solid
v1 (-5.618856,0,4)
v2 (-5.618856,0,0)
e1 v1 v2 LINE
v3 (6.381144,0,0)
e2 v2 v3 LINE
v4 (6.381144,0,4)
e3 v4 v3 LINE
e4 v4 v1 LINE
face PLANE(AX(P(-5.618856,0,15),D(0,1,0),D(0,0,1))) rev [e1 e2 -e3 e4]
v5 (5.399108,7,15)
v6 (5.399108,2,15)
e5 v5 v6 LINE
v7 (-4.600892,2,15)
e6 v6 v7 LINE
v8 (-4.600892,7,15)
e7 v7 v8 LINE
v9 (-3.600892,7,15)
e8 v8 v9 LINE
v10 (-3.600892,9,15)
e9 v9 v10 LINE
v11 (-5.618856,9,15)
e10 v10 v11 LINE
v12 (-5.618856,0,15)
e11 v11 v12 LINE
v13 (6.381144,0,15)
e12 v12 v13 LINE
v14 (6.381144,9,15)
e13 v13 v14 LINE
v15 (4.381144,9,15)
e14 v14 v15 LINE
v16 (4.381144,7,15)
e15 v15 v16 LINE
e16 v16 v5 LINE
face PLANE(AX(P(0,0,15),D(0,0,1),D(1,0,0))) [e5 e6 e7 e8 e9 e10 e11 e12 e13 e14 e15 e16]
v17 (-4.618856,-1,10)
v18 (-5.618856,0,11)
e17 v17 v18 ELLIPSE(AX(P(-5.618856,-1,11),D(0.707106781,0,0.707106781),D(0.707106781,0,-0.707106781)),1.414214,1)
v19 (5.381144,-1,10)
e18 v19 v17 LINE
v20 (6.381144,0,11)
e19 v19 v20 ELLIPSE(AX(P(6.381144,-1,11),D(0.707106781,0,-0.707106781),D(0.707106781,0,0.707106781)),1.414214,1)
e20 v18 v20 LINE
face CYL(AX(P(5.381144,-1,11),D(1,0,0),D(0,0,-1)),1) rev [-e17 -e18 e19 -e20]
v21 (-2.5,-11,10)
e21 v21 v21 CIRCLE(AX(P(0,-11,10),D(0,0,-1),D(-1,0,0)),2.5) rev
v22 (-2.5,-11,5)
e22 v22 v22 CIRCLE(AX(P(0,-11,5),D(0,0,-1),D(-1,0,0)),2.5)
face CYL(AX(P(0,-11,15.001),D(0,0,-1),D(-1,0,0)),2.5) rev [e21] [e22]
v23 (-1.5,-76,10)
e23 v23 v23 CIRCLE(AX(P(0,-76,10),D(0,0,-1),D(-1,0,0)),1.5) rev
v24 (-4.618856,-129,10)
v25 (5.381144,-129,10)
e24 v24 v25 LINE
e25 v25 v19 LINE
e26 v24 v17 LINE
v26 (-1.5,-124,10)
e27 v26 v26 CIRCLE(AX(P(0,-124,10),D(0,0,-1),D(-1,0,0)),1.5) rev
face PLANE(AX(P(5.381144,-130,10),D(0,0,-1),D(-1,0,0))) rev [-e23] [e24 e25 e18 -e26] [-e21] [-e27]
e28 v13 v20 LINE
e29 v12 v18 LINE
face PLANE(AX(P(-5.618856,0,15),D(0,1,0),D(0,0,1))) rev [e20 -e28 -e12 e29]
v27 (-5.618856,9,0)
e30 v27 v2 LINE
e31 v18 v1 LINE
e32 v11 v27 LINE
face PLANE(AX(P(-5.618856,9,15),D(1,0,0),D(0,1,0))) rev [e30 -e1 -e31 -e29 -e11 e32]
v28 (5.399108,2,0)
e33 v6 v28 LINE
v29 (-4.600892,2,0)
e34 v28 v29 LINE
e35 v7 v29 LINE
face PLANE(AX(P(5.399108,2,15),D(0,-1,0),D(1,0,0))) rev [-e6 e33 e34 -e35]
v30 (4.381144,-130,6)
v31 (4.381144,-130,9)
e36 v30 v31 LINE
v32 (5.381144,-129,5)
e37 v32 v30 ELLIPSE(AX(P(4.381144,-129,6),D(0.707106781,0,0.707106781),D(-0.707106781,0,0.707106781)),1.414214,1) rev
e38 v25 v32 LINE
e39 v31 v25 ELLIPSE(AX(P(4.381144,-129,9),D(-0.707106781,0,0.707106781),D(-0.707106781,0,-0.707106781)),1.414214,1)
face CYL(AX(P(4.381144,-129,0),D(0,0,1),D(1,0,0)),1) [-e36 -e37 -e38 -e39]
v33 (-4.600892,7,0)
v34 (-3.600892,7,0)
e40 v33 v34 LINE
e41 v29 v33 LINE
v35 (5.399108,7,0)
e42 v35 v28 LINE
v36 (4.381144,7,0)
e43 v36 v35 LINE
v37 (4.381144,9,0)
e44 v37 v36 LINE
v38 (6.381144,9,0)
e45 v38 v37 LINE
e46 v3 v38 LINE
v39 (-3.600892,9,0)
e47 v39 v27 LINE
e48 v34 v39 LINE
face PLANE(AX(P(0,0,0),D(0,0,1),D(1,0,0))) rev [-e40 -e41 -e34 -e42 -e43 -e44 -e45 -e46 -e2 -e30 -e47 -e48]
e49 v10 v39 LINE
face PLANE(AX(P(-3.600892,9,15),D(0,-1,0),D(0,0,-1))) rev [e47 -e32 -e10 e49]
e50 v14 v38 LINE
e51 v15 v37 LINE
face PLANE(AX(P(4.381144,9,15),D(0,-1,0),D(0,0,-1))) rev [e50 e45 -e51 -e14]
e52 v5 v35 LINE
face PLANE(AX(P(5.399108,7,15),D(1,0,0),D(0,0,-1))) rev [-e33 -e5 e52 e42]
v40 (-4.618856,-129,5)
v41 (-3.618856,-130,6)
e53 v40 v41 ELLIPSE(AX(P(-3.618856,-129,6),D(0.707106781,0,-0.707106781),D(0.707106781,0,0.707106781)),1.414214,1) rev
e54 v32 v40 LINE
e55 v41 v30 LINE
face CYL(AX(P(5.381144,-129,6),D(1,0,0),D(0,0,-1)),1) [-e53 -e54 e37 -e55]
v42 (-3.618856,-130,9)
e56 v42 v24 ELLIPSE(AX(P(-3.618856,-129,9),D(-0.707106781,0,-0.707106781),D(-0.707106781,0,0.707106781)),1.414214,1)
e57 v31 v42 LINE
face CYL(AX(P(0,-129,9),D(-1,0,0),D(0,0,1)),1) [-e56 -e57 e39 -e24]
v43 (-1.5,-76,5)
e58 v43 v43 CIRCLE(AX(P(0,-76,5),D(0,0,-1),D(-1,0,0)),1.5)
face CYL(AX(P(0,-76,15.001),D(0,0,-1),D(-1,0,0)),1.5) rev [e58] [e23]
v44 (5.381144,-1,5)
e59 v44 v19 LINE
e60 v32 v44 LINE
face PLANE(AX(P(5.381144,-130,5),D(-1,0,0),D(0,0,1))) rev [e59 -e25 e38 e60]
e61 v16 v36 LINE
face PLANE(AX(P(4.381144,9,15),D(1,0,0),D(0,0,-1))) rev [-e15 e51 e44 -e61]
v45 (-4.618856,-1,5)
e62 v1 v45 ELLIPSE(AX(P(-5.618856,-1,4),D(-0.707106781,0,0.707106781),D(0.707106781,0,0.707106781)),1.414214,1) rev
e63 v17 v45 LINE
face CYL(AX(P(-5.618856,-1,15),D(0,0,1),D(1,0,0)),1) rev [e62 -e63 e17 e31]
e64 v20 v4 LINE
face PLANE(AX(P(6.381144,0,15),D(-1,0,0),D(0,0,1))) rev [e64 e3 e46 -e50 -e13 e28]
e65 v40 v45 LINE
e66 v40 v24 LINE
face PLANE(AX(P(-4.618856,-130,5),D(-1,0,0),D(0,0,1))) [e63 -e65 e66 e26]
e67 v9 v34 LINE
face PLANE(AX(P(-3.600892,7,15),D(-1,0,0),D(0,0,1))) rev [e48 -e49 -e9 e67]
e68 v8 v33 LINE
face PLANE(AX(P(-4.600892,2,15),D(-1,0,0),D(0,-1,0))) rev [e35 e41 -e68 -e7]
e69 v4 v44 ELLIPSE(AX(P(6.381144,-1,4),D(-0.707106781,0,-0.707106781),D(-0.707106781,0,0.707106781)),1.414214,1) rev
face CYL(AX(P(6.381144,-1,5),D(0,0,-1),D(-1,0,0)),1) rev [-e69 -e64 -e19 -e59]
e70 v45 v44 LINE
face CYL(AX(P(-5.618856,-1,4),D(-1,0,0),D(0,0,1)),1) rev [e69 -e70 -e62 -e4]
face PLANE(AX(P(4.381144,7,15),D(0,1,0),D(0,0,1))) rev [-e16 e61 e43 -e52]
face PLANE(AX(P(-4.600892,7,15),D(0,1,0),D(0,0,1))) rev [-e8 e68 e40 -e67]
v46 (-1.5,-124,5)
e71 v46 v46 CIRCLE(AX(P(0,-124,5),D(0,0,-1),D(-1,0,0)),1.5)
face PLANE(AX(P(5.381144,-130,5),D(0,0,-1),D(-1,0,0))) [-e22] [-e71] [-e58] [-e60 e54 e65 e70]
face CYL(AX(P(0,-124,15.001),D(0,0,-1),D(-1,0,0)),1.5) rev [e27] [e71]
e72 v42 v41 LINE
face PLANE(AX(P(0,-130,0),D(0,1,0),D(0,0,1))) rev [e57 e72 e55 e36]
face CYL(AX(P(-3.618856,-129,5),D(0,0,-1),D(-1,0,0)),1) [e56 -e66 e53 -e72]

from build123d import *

# Parameters (mm, degrees)
BOSS_EXTRUDE1_DEPTH = 15
SKETCH2_W           = 10
SKETCH2_H           = 5
BOSS_EXTRUDE2_DEPTH = 130
FILLET3_R           = 1
FILLET4_R           = 1
FILLET5_R           = 1
FILLET6_R           = 1
CUT_EXTRUDE1_REACH  = 132.54
SKETCH3_R           = 2.5
SKETCH3_R_2         = 1.5


with BuildPart() as part:
    # Sketch1 → Boss-Extrude1 (new body)
    with BuildSketch(Plane.XY):
        Polygon((-5.618855965, 9), (-5.618855965, 0), (6.381144035, 0), (6.381144035, 9), (4.381144035, 9), (4.381144035, 7), (5.399108107, 7), (5.399108107, 2), (-4.600891893, 2), (-4.600891893, 7), (-3.600891893, 7), (-3.600891893, 9), align=None)
    extrude(amount=BOSS_EXTRUDE1_DEPTH)

    # Sketch2 → Boss-Extrude2 (add)
    with BuildSketch(Plane.XZ):
        with Locations((0.381144035, 7.5)):
            Rectangle(SKETCH2_W, SKETCH2_H)
    extrude(amount=BOSS_EXTRUDE2_DEPTH)

    # Fillet3
    fillet3_edges = [part.edges().sort_by_distance(p)[0] for p in [
        (0.381144035, 0, 10),
        (-4.618855965, 0, 7.5),
    ]]
    fillet(fillet3_edges, radius=FILLET3_R - 0.0001)  # a hair under: the kernel refuses the full size

    # Fillet4
    fillet4_edges = [part.edges().sort_by_distance(p)[0] for p in [
        (-0.118805965, 0, 5),
    ]]
    fillet(fillet4_edges, radius=FILLET4_R - 0.0001)  # a hair under: the kernel refuses the full size

    # Fillet5
    fillet5_edges = [part.edges().sort_by_distance(p)[0] for p in [
        (5.381144035, 0, 7.5),
    ]]
    fillet(fillet5_edges, radius=FILLET5_R - 0.0001)  # a hair under: the kernel refuses the full size

    # Fillet6
    fillet6_edges = [part.edges().sort_by_distance(p)[0] for p in [
        (-4.618855965, -130, 7.5),
        (0.381144035, -130, 5),
        (0.381144035, -130, 10),
        (5.381144035, -130, 7.5),
    ]]
    fillet(fillet6_edges, radius=FILLET6_R)

    # Sketch3 → Cut-Extrude1 (cut, up to next)
    with BuildSketch(Plane(origin=(0, 0, 5), x_dir=(-1, 0, 0), z_dir=(0, 0, -1)), mode=Mode.PRIVATE) as cut_extrude1_sk1:
        with Locations((0, -11)):
            Circle(SKETCH3_R)
    cut_extrude1_tool1 = extrude(cut_extrude1_sk1.sketch, amount=-CUT_EXTRUDE1_REACH, mode=Mode.PRIVATE) & part.part
    # Sketch3 → Cut-Extrude1 (cut, up to next)
    with BuildSketch(Plane(origin=(0, 0, 5), x_dir=(-1, 0, 0), z_dir=(0, 0, -1)), mode=Mode.PRIVATE) as cut_extrude1_sk2:
        with Locations((0, -124)):
            Circle(SKETCH3_R_2)
    cut_extrude1_tool2 = extrude(cut_extrude1_sk2.sketch, amount=-CUT_EXTRUDE1_REACH, mode=Mode.PRIVATE) & part.part
    # Sketch3 → Cut-Extrude1 (cut, up to next)
    with BuildSketch(Plane(origin=(0, 0, 5), x_dir=(-1, 0, 0), z_dir=(0, 0, -1)), mode=Mode.PRIVATE) as cut_extrude1_sk3:
        with Locations((0, -76)):
            Circle(SKETCH3_R_2)
    cut_extrude1_tool3 = extrude(cut_extrude1_sk3.sketch, amount=-CUT_EXTRUDE1_REACH, mode=Mode.PRIVATE) & part.part
    add(cut_extrude1_tool1.solids().sort_by_distance((0, -11, 5))[0], mode=Mode.SUBTRACT)
    add(cut_extrude1_tool2.solids().sort_by_distance((0, -124, 5))[0], mode=Mode.SUBTRACT)
    add(cut_extrude1_tool3.solids().sort_by_distance((0, -76, 5))[0], mode=Mode.SUBTRACT)


solid = part.part
